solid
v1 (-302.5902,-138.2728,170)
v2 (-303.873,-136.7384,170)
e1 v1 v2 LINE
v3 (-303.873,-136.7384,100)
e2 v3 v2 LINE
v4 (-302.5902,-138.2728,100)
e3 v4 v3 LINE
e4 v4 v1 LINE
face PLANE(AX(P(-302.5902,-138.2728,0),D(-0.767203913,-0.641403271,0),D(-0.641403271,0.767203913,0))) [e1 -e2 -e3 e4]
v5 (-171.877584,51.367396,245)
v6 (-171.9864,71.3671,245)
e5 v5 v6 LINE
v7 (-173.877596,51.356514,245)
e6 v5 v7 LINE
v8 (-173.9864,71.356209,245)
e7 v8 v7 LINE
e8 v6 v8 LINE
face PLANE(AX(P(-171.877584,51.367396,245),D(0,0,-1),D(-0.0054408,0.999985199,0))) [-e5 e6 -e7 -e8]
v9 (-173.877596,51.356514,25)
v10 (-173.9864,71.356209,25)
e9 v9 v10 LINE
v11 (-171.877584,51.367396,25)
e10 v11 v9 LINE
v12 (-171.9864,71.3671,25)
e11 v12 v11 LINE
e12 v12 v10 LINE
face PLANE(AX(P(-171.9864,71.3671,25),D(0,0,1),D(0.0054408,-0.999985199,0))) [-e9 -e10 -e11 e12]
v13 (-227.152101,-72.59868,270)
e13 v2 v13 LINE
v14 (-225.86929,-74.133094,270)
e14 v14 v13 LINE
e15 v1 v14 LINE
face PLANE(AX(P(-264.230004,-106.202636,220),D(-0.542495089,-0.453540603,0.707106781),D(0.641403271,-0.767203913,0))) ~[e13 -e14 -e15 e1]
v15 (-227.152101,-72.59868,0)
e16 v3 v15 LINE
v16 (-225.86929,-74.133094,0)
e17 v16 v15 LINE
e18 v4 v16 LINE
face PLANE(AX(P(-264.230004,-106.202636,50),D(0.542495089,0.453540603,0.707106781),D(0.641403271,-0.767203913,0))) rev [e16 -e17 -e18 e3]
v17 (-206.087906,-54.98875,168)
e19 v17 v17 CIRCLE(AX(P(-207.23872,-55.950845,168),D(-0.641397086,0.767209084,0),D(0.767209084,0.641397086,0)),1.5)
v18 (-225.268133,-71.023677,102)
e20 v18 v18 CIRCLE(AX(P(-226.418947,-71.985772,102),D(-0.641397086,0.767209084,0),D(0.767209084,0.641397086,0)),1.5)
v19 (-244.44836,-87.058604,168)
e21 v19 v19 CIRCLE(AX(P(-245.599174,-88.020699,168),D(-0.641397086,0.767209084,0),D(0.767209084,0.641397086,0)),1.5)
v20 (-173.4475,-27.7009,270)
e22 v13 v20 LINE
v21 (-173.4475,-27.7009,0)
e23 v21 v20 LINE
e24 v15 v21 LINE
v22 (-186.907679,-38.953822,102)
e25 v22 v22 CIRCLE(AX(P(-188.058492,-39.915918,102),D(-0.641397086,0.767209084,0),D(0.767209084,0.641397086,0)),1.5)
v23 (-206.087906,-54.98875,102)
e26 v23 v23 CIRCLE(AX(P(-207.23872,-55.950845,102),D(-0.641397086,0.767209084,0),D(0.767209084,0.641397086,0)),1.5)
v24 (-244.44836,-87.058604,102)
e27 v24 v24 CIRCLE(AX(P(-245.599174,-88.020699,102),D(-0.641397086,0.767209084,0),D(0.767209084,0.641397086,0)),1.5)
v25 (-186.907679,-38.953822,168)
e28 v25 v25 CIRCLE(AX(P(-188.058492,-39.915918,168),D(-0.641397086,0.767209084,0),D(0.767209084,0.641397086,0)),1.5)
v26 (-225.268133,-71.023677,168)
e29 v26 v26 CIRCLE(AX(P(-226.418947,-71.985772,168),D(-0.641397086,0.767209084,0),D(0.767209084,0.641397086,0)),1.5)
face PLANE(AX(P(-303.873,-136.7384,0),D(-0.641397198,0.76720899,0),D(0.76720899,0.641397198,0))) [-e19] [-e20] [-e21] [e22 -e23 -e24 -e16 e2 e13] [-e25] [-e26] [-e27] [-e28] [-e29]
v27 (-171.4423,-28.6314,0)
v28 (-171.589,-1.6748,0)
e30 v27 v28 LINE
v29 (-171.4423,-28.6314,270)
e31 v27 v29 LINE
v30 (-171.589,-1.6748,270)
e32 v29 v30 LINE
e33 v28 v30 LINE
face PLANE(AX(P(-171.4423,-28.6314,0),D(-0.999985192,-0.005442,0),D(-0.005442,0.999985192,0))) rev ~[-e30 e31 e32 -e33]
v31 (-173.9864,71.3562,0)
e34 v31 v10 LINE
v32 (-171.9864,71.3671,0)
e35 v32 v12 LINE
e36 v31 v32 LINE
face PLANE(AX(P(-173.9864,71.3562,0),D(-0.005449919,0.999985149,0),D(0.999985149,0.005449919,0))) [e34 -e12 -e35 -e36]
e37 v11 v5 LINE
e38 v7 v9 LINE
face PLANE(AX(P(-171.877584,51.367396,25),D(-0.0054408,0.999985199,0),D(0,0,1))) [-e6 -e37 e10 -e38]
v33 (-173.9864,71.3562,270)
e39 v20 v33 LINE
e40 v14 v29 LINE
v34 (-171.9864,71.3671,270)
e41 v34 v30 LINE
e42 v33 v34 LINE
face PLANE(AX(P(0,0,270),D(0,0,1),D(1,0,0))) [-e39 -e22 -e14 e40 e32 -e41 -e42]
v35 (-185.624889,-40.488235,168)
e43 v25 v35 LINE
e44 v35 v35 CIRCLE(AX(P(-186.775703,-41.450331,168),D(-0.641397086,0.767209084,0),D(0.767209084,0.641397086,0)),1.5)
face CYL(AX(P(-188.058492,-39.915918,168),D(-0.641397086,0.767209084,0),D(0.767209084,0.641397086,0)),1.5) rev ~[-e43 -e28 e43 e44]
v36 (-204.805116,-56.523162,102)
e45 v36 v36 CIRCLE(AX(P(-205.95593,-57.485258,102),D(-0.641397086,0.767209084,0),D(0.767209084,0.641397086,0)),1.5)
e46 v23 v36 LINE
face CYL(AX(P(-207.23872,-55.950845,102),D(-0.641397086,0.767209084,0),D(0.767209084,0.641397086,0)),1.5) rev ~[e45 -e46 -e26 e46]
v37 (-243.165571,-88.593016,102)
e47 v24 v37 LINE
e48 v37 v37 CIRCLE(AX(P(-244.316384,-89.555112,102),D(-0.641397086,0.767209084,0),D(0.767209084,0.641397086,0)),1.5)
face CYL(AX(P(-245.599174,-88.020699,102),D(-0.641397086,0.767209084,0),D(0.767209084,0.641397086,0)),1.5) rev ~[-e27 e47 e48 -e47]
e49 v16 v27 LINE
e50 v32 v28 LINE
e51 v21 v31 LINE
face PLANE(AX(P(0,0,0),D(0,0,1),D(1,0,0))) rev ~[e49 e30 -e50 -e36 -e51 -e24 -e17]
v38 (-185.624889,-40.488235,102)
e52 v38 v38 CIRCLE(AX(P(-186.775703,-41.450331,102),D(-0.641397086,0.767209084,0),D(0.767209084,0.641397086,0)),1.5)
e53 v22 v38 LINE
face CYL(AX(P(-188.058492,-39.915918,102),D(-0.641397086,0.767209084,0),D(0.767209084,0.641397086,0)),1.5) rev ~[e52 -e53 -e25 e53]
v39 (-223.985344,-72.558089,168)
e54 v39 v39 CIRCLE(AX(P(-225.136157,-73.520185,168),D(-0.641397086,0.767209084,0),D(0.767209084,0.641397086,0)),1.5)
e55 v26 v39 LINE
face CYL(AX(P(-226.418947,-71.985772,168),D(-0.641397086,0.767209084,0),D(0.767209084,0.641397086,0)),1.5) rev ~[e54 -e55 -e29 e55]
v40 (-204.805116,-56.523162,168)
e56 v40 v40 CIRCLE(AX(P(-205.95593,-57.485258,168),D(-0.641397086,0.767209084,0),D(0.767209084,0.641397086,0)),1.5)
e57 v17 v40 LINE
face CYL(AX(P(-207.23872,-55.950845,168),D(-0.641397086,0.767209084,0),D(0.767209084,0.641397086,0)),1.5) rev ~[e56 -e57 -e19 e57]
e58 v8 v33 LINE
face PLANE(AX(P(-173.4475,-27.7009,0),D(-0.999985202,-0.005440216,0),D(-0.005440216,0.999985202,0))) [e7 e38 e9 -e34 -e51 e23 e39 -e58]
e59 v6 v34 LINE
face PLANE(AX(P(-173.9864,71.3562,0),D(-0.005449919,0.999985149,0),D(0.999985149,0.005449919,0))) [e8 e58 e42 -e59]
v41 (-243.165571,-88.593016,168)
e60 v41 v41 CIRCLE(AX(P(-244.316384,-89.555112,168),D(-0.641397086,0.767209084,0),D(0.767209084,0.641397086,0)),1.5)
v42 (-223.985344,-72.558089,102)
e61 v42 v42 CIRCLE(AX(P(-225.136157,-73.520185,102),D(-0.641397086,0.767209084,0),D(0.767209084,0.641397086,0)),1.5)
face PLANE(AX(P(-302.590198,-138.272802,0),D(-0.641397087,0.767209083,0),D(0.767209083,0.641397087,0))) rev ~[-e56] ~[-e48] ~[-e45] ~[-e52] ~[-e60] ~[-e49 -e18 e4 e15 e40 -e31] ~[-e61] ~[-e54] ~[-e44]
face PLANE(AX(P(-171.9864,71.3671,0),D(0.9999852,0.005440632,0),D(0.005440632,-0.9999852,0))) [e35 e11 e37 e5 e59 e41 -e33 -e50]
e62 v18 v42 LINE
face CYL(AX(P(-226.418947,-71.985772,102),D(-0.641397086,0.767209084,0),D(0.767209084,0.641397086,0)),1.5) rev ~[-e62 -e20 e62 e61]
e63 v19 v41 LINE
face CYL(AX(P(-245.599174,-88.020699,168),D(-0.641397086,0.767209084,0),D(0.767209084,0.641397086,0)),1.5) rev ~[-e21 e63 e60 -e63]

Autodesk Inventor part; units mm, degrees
ref_plane "YZ Plane" through (0, 0, 0) normal (1, 0, 0) x (0, 1, 0)
ref_plane "XZ Plane" through (0, 0, 0) normal (0, 1, 0) x (-1, 0, 0)
ref_plane "XY Plane" through (0, 0, 0) normal (0, 0, 1) x (1, 0, 0)
sketch "スケッチ1" plane through (0, 0, 0) normal (0, 0, 1) x (1, 0, 0)
  circle A0 centre (-149.101, -13.3308) radius 1.5 construction
  circle A1 centre (-160.5892, -1.6149) radius 1.5 construction
  circle A2 centre (-44.4492, 64.0137) radius 1.5 construction
  circle A3 centre (-64.4423, 49.0046) radius 1.5 construction
  circle A4 centre (-60.4494, 64.5064) radius 1.5 construction
  arc A5 (-40.2316, 58.3956) -> (-44.233, 71.0354) centre (-44.4492, 64.0137) ccw construction
  line L0 (-44.233, 71.0354) -> (-60.2332, 71.5281) construction
  arc A6 (-60.2332, 71.5281) -> (-64.1725, 70.4637) centre (-60.4494, 64.5064) ccw construction
  line L1 (-64.1725, 70.4637) -> (-165.9022, 6.8864) construction
  arc A7 (-165.9022, 6.8864) -> (-166.8262, -9.4635) centre (-160.5892, -1.6149) ccw construction
  line L2 (-166.8262, -9.4635) -> (-154.0782, -19.594) construction
  arc A8 (-154.0782, -19.594) -> (-144.2981, -19.7286) centre (-149.101, -13.3308) ccw construction
  line L3 (-144.2981, -19.7286) -> (-40.2316, 58.3956) construction
  circle A9 centre (-82.1645, 51.5544) radius 1.5 construction
  circle A10 centre (-141.748, 14.817) radius 1.5 construction
  circle A11 centre (-89.4637, 29.5642) radius 1.5 construction
  circle A12 centre (-117.4541, 8.5514) radius 1.5 construction
  circle A13 centre (-111.8449, 33.0052) radius 1.5 construction
  line L4 (-152.7009, -26.0367) -> (-305.9655, -141.0946)
  circle A14 centre (-149.101, -13.3308) radius 1.5 construction
  circle A15 centre (-149.101, -13.3308) radius 3 construction
  circle A16 centre (-149.101, -13.3308) radius 3 construction
  circle A17 centre (-160.5892, -1.6149) radius 9.025 construction
  circle A18 centre (-160.5892, -1.6149) radius 4.025
  line L5 (-152.7009, -26.0367) -> (-151.5741, -2.0382)
  line L6 (-64.1725, 70.4637) -> (-165.9022, 6.8864) construction
  line L7 (-144.2981, -19.7286) -> (-40.2316, 58.3956) construction
  line L8 (-305.9655, -141.0946) -> (-171.4423, -28.6314)
  line L9 (-160.5892, -1.6149) -> (-146.0204, -21.0215) construction
  line L10 (-146.0204, -21.0215) -> (-305.9655, -141.0946) construction
  circle A19 centre (-276.0256, -117.3678) radius 1
  circle A20 centre (-160.5892, -1.6149) radius 11
  line L11 (-171.4423, -28.6314) -> (-171.589, -1.6748)
  point P0 (0, 0)
  point P1 (0, 0)
  point P2 (0, 0)
  point P3 (-276.667, -116.6006)
  point P4 (-275.4252, -118.1676)
  point P5 (-151.8691, -8.3201)
  dimension "d6" = 22
  dimension "d0" = 6
  dimension "d1" = 8.05
  dimension "d2" = 5
  dimension "d3" = 3
  dimension "d4" = 200
  dimension "d5" = 2
  dimension "d7" = 3
  dimension "d8" = 6
sketch "スケッチ2" plane through (0, 0, 0) normal (0, 0, 1) x (1, 0, 0)
  line L0 (-305.9655, -141.0946) -> (-171.4423, -28.6314) projected
  line L1 (-171.4423, -28.6314) -> (-171.589, -1.6748) projected
  line L2 (-302.5902, -138.2728) -> (-303.873, -136.7384)
  line L3 (-303.873, -136.7384) -> (-173.4475, -27.7009)
  line L4 (-173.4475, -27.7009) -> (-173.9864, 71.3562)
  line L5 (-173.9864, 71.3562) -> (-171.9864, 71.3671)
  line L6 (-171.9864, 71.3671) -> (-171.589, -1.6748)
  point P0 (0, 0)
  dimension "d9" = 2
  dimension "d10" = 2
  dimension "d11" = 100
  dimension "d14" = 170
extrude "押し出し1" add sketch "スケッチ2" along normal blind 270
sketch "スケッチ3" plane through (0, 0, 270) normal (0, 0, 1) x (1, 0, 0)
  arc A0 (-225.7, -73.9915) -> (-224.5724, -73.0489) centre (-225.6172, -72.9448) ccw
  line L0 (-225.7, -73.9915) -> (-243.7526, -89.0838)
  arc A1 (-244.8802, -90.0264) -> (-243.7526, -89.0838) centre (-244.7975, -88.9797) ccw
  line L1 (-244.8802, -90.0264) -> (-276.667, -116.6006)
  arc A2 (-276.667, -116.6006) -> (-275.4252, -118.1676) centre (-276.0256, -117.3678) ccw
  line L2 (-275.4252, -118.1676) -> (-152.7009, -26.0367)
  line L3 (-152.7009, -26.0367) -> (-151.8691, -8.3201)
  arc A3 (-151.8691, -8.3201) -> (-171.589, -1.6748) centre (-160.5892, -1.6149) ccw
  line L4 (-171.589, -1.6748) -> (-171.4423, -28.6314)
  line L5 (-171.4423, -28.6314) -> (-186.2119, -40.979)
  arc A4 (-187.3395, -41.9217) -> (-186.2119, -40.979) centre (-187.2568, -40.8749) ccw
  line L6 (-187.3395, -41.9217) -> (-205.3922, -57.0139)
  arc A5 (-206.5197, -57.9566) -> (-205.3922, -57.0139) centre (-206.437, -56.9099) ccw
  line L7 (-206.5197, -57.9566) -> (-224.5724, -73.0489)
  circle A6 centre (-171.2358, -34.3242) radius 1.5
  circle A7 centre (-160.5892, -1.6149) radius 4.025
  point P0 (0, 0)
  point P1 (0, 0)
sketch "スケッチ4" plane through (-303.873, -136.7384, 270) normal (-0.6413971, 0.7672091, 0) x (0.7672091, 0.6413971, 0)
  line L0 (234.6628, 270) -> (234.6628, 0) projected
  circle A0 centre (150.9556, 102) radius 1.5
  circle A1 centre (125.9556, 102) radius 1.5
  circle A2 centre (100.9556, 102) radius 1.5
  circle A3 centre (75.9556, 102) radius 1.5
  line L1 (234.6628, 135) -> (-10.981, 135)
  circle A4 centre (150.9556, 168) radius 1.5
  circle A5 centre (125.9556, 168) radius 1.5
  circle A6 centre (100.9556, 168) radius 1.5
  circle A7 centre (75.9556, 168) radius 1.5
  line L2 (154.7693, 165) -> (132.5454, 165)
  line L3 (157.7493, 105) -> (143.6573, 105)
  point P0 (320.8377, 270)
  point P1 (150.9556, 0)
  point P2 (125.9556, 0)
  point P3 (100.9556, 0)
  point P4 (75.9556, 0)
  dimension "d15" = 3
  dimension "d16" = 3
  dimension "d17" = 3
  dimension "d18" = 3
  dimension "d20" = 33
  dimension "d27" = 3
  dimension "d28" = 3
  dimension "d29" = 60
extrude "押し出し2" cut sketch "スケッチ4" against normal through all
chamfer "面取り1" distance 100 angle 45 2 edges at (-303.2316, -137.5056, 0) (-303.2316, -137.5056, 270)
sketch "スケッチ5" plane through (-171.9864, 71.3671, 270) normal (0.9999852, 0.0054408, 0) x (0, 0, -1)
  line L0 (270, 0) -> (0, 0) projected
  line L1 (0, 0) -> (0, -99.0586) projected
  line L2 (0, 0) -> (25, 0)
  line L3 (270, 0) -> (245, 0)
  line L4 (245, 0) -> (245, -20)
  line L5 (245, -20) -> (25, -20)
  line L6 (25, -20) -> (25, 0)
  point P0 (270, -72.3018)
  dimension "d30" = 25
  dimension "d31" = 25
  dimension "d32" = 20
extrude "押し出し3" cut sketch "スケッチ5" against normal through all
equation "\"d8\" = d0"
properties part number "アームシールド1" material "ポリカーボネート、クリア"
